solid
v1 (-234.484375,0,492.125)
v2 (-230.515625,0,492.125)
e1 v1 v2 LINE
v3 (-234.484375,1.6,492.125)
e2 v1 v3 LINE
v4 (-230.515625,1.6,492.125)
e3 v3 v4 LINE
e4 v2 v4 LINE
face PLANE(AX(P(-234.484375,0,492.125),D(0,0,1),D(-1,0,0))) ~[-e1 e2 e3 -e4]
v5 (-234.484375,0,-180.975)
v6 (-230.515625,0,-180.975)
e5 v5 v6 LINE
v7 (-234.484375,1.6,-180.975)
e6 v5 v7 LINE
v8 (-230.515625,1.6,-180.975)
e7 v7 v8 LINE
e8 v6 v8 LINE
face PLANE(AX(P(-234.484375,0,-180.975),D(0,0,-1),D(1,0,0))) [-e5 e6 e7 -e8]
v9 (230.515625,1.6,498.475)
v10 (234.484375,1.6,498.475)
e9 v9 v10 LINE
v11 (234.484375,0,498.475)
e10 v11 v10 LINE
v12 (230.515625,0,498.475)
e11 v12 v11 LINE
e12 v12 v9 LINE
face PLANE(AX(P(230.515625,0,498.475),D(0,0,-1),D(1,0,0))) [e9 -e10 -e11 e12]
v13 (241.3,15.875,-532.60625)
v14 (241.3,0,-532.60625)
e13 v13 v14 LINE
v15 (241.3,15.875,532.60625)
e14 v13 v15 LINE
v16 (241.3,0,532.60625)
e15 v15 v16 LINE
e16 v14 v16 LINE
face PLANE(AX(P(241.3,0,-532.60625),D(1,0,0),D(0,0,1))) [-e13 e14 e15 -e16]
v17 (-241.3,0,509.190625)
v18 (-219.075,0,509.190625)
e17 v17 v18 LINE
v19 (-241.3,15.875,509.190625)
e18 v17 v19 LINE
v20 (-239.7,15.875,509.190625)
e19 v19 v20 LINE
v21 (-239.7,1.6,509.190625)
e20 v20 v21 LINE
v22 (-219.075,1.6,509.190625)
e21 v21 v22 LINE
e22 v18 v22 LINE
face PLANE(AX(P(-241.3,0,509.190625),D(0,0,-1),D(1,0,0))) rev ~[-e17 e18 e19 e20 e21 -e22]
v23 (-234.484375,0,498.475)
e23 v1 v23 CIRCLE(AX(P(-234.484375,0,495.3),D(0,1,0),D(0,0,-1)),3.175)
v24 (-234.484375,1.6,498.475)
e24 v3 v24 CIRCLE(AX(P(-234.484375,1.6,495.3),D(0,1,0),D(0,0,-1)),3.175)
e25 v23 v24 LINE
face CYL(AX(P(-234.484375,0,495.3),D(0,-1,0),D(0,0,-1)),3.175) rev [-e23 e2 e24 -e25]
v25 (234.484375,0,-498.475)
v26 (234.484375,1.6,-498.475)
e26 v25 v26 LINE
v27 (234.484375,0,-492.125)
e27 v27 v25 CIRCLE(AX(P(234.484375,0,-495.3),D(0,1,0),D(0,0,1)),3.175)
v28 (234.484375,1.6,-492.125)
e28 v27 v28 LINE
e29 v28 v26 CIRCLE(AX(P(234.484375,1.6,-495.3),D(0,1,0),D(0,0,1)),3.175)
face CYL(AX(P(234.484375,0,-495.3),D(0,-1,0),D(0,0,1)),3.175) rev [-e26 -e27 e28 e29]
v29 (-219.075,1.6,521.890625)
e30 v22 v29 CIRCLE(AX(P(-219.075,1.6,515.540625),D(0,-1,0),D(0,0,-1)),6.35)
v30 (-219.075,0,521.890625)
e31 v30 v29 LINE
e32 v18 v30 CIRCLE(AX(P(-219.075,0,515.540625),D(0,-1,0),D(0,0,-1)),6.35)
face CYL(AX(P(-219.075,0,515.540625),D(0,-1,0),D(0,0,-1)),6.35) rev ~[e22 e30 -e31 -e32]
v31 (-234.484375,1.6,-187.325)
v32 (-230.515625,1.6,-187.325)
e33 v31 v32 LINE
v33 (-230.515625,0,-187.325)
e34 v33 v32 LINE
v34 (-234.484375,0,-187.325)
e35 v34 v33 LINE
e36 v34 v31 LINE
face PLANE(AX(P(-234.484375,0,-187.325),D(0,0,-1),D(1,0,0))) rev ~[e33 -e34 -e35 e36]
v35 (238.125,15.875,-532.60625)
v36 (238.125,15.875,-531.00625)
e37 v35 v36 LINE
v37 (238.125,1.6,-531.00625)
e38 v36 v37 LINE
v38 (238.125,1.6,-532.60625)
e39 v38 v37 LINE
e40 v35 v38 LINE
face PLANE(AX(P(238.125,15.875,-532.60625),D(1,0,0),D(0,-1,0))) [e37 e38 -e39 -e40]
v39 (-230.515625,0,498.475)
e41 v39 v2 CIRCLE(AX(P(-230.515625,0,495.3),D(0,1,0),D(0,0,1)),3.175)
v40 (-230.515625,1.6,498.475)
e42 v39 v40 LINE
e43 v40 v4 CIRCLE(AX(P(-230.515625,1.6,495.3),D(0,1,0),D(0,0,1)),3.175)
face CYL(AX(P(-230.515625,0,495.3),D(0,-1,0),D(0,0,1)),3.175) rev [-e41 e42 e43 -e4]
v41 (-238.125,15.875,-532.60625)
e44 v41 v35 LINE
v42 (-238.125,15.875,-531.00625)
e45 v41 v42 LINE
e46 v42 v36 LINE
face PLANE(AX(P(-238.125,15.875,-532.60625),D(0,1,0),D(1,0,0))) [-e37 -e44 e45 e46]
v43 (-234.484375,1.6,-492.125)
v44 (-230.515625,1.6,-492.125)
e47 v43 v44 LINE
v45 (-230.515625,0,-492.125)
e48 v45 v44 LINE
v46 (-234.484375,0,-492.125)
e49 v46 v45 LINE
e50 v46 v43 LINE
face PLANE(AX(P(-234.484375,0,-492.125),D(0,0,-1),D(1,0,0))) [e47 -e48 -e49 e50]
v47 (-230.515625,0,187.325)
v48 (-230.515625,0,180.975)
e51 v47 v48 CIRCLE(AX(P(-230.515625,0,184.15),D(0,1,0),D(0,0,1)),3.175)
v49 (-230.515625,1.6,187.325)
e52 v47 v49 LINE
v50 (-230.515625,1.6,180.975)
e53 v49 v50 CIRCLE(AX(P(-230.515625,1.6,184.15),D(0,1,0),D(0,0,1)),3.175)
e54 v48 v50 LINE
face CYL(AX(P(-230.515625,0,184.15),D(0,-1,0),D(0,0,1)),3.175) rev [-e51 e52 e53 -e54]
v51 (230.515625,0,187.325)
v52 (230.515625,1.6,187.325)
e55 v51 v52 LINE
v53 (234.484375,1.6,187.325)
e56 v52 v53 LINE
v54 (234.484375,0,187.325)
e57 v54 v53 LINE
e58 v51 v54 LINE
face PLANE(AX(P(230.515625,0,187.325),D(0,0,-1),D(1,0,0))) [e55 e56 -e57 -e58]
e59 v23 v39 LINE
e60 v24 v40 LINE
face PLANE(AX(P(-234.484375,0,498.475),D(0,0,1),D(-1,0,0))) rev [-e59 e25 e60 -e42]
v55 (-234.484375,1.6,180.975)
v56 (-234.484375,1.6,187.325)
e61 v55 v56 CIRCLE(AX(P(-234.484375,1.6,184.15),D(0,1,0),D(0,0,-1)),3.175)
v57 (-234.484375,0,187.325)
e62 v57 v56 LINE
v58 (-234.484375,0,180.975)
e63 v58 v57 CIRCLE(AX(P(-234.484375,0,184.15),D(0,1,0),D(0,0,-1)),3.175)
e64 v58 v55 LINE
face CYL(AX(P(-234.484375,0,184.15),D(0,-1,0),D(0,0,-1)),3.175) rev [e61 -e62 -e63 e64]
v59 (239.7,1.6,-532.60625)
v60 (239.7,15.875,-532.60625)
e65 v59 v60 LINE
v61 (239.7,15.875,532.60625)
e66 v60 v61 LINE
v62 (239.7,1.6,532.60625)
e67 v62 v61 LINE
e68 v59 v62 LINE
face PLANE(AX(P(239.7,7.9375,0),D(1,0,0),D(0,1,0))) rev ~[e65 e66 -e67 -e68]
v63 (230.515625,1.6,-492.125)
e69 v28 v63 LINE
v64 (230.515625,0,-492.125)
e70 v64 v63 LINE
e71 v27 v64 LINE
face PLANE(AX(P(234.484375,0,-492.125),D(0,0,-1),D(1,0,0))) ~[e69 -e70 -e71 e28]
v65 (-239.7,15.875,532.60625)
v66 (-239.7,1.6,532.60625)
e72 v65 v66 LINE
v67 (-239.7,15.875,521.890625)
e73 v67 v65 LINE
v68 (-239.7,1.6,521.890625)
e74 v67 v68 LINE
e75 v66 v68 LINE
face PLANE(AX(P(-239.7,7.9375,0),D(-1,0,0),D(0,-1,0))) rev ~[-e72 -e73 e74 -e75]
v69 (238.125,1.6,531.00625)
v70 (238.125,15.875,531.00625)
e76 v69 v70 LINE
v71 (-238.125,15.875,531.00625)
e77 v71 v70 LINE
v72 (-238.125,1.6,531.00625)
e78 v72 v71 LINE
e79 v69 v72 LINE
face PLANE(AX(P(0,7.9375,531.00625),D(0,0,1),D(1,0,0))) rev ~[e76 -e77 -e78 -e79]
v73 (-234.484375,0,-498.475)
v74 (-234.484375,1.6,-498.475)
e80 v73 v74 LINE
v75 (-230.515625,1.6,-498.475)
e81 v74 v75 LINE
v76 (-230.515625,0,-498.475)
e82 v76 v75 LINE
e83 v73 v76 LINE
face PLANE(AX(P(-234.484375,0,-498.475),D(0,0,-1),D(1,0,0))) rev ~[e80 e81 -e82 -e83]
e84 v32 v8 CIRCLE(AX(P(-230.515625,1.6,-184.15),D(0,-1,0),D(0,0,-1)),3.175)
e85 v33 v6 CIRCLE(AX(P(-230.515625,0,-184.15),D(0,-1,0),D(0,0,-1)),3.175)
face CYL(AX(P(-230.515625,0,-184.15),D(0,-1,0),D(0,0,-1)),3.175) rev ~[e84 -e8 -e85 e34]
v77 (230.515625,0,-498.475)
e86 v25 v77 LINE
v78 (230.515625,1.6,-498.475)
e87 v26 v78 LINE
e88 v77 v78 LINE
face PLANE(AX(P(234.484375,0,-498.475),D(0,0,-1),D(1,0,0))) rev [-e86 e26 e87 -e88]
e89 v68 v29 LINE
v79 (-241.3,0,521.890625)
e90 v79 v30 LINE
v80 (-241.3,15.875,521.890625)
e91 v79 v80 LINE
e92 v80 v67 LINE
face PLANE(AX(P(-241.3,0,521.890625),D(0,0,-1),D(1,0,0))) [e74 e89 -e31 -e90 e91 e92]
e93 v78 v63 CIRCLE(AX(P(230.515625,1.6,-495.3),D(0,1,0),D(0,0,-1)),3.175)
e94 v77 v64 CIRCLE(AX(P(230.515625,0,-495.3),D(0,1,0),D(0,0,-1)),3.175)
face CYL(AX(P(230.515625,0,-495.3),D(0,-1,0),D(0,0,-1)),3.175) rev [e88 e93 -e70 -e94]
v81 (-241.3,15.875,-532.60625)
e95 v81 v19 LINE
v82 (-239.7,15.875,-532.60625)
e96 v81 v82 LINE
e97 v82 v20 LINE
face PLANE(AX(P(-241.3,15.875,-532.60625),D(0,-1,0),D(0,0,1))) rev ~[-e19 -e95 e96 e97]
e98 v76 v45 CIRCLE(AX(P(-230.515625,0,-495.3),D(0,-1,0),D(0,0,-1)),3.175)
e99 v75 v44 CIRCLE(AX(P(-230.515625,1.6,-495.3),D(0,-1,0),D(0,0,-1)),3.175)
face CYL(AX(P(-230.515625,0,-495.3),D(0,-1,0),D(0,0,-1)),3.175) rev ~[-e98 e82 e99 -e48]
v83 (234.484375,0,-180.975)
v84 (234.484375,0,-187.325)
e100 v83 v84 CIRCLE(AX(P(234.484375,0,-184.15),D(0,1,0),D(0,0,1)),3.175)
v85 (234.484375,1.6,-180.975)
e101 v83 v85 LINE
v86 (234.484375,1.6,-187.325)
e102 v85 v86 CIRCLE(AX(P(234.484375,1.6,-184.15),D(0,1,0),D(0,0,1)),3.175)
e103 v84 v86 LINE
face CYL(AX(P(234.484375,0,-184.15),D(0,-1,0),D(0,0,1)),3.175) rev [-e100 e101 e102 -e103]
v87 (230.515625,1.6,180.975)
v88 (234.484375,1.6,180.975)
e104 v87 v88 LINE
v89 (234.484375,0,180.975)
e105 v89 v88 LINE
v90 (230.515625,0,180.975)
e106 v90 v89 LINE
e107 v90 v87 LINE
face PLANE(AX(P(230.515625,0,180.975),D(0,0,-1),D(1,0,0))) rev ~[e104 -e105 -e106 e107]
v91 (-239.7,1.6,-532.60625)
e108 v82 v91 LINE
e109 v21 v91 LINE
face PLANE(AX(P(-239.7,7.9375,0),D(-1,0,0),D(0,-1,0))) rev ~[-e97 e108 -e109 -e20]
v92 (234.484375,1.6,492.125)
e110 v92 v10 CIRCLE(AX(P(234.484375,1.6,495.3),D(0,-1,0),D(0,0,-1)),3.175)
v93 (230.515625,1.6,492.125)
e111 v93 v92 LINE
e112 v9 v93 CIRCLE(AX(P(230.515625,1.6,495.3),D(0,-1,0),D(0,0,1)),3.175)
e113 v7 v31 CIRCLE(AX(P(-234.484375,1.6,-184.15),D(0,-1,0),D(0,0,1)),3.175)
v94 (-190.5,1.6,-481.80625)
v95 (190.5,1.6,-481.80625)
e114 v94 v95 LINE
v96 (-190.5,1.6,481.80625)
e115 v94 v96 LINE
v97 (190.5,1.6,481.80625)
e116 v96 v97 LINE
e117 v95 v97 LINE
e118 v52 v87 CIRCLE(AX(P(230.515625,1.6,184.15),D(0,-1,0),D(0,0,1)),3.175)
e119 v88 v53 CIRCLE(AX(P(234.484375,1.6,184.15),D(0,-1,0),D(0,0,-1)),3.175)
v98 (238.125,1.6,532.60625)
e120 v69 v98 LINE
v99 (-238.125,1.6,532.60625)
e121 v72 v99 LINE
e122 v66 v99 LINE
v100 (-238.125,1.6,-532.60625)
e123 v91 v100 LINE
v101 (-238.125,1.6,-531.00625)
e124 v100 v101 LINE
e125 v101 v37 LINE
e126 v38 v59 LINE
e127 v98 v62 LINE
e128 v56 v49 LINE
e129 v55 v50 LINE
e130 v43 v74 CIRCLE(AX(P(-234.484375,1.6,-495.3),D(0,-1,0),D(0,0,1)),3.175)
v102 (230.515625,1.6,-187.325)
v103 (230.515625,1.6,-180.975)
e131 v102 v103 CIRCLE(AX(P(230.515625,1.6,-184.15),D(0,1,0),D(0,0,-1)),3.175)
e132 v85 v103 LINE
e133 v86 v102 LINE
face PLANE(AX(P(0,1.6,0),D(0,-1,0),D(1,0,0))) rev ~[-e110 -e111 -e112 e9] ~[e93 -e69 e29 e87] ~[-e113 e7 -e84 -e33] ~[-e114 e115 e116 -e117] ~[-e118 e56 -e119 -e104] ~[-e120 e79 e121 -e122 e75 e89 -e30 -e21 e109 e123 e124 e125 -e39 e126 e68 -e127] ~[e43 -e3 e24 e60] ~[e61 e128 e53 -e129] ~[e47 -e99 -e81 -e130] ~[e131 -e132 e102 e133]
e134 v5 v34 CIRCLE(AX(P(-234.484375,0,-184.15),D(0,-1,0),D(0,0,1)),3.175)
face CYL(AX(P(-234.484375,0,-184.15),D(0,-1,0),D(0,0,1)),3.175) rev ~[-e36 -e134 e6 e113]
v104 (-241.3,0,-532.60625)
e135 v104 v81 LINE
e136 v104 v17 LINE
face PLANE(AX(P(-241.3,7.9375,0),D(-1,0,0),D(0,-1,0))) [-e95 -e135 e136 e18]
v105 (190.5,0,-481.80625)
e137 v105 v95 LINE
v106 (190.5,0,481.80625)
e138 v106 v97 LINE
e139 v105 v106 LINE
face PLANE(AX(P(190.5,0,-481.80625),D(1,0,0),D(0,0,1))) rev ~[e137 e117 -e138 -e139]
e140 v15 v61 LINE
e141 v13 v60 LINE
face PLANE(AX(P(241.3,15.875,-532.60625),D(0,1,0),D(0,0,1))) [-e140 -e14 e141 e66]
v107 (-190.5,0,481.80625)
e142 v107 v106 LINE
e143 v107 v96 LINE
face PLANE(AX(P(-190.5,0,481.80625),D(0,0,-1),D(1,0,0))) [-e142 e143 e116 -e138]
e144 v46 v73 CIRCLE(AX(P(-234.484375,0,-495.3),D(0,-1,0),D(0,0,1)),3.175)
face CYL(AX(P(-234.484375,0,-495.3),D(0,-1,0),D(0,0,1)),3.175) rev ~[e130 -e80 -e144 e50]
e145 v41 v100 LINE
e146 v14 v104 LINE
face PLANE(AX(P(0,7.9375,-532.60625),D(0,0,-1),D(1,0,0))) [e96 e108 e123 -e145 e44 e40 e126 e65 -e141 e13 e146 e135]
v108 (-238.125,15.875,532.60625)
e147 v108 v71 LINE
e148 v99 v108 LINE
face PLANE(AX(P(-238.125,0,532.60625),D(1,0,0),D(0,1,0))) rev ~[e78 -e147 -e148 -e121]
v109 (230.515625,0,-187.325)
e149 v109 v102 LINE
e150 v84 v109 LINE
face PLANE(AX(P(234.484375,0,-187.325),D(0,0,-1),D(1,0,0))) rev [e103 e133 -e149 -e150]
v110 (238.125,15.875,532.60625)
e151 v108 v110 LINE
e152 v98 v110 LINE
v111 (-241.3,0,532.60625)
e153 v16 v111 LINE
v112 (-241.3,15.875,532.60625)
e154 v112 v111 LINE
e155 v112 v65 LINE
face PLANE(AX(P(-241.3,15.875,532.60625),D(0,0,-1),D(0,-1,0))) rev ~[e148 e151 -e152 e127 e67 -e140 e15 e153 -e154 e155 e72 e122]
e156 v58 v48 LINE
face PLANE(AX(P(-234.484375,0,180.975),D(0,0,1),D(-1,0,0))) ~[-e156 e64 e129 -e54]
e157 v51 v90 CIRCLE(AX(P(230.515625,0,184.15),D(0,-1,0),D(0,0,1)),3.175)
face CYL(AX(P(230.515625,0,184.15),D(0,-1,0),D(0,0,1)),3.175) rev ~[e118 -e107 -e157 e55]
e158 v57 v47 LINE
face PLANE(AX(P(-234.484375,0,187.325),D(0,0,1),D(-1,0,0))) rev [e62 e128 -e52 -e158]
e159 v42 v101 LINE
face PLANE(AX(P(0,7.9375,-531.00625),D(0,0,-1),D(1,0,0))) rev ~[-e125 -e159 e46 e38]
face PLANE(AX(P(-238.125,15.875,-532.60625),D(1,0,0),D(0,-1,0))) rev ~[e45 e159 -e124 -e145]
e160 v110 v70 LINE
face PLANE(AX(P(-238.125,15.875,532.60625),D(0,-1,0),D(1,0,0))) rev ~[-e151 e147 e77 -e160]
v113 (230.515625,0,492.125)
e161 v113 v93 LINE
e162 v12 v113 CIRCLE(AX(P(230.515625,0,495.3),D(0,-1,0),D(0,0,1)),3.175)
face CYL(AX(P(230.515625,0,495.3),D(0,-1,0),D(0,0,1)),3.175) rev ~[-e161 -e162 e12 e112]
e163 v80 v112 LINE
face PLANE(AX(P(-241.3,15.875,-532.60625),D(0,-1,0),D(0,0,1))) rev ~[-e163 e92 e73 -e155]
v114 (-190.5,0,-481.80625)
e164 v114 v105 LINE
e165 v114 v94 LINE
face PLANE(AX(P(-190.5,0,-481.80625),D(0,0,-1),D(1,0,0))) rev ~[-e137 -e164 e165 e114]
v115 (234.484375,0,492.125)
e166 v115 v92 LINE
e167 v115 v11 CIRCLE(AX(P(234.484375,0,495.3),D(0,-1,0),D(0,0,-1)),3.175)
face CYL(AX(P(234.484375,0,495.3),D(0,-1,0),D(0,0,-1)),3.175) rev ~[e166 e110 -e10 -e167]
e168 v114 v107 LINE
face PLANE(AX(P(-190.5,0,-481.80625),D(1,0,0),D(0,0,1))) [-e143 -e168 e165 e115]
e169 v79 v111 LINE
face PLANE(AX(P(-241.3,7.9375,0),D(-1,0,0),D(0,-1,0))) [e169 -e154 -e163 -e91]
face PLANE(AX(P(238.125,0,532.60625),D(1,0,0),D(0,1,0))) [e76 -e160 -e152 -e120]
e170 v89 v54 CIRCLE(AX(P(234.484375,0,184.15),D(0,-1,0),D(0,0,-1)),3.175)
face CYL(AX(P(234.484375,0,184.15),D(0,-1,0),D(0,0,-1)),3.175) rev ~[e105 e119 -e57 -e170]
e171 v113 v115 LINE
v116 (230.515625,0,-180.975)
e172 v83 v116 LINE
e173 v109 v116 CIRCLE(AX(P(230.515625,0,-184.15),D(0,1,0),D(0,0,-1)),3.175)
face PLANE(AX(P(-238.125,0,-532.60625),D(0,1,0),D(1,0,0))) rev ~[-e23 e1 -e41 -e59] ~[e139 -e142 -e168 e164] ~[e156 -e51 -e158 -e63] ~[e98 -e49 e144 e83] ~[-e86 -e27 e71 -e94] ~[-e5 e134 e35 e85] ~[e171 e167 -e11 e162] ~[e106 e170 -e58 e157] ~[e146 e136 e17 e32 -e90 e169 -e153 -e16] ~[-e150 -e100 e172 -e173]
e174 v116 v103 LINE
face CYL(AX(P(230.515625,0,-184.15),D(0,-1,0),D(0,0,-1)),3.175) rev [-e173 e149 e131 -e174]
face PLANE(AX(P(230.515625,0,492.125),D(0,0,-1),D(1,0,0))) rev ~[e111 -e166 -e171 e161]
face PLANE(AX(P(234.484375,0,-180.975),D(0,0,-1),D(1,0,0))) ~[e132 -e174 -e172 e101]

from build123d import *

# Parameters (mm, degrees)
F0_W              = 482.6
F0_H              = 1065.2125
F1_DEPTH          = 1.6
F2_W              = 15.875
F2_H              = 1065.2125
F3_DEPTH          = 1.6
F4_W              = 15.875
F4_H              = 1065.2125
F5_DEPTH          = 1.6
F6_W              = 476.25
F6_H              = 15.875
F7_DEPTH          = 1.6
F8_W              = 476.25
F8_H              = 15.875
F9_DEPTH          = 1.6
F10_W             = 381
F10_H             = 963.6125
F11_DEPTH         = 1.6
F12_W             = 3.96875
F12_H             = 6.35
F13_DEPTH         = 1.6
F13_COPIES3_COUNT = 2
F13_COPIES3_PITCH = 1094.309536
F13_COPIES4_COUNT = 2
F13_COPIES4_PITCH = 823.333045
F14_W             = 3.96875
F14_H             = 6.35
F15_DEPTH         = 1.6
F16_W             = 22.225
F16_H             = 12.7
F17_DEPTH         = 16


# Not quite as in the source:
# - a pattern or mirror of a feature is missing from the dataset's text; its kind, count and spacing are read off the source's solid


with BuildPart() as f1:
    # F0 (on Front) → F1 (new body)
    with BuildSketch(Plane.XZ):
        Rectangle(F0_W, F0_H)
    extrude(amount=-F1_DEPTH)

    # F2 (on face) → F3 (join)
    with BuildSketch(Plane(origin=(-241.3, 0, 0), x_dir=(0, -1, 0), z_dir=(-1, 0, 0))):
        with Locations((-7.9375, 0)):
            Rectangle(F2_W, F2_H)
    extrude(amount=-F3_DEPTH)

    # F4 (on face) → F5 (join)
    with BuildSketch(Plane.YZ.offset(241.3)):
        with Locations((7.9375, 0)):
            Rectangle(F4_W, F4_H)
    extrude(amount=-F5_DEPTH)

    # F6 (on face) → F7 (join)
    with BuildSketch(Plane.XY.offset(532.60625)):
        with Locations((0, 7.9375)):
            Rectangle(F6_W, F6_H)
    extrude(amount=-F7_DEPTH)

    # F8 (on face) → F9 (join)
    with BuildSketch(Plane(origin=(0, 0, -532.60625), x_dir=(1, 0, 0), z_dir=(0, 0, -1))):
        with Locations((0, -7.9375)):
            Rectangle(F8_W, F8_H)
    extrude(amount=-F9_DEPTH)

    # F10 (on face) → F11 (cut)
    with BuildSketch(Plane.XZ):
        Rectangle(F10_W, F10_H)
    extrude(amount=-F11_DEPTH, mode=Mode.SUBTRACT)

    # F12 (on face) → F13 (cut)
    with BuildSketch(Plane.XZ):
        with Locations((-232.5, -495.3)):
            Rectangle(F12_W, F12_H)
        with BuildLine():
            Line((-230.515625, -492.125), (-230.515625, -498.475))
            ThreePointArc((-230.515625, -498.475), (-227.340625, -495.3), (-230.515625, -492.125))
        make_face()
        with BuildLine():
            ThreePointArc((-234.484375, -492.125), (-237.659375, -495.3), (-234.484375, -498.475))
            Line((-234.484375, -498.475), (-234.484375, -492.125))
        make_face()
    f13 = extrude(amount=-F13_DEPTH, mode=Mode.SUBTRACT)

    # F13_copies: F13 across plane
    add(f13.mirror(Plane.XY), mode=Mode.SUBTRACT)

    # F13_copies1: F13 across plane
    add(f13.mirror(Plane.XY.offset(-155.575)), mode=Mode.SUBTRACT)

    # F13_copies2: F13 across plane
    add(f13.mirror(Plane(origin=(0, 0, 0), x_dir=(0, 0, 1), z_dir=(1, 0, 0))), mode=Mode.SUBTRACT)

    # F13_copies3: F13 ×2
    with Locations(*[Vector(0.4249254757, 0, 0.9052283359) * (i * F13_COPIES3_PITCH) for i in range(1, F13_COPIES3_COUNT)]):
        add(f13, mode=Mode.SUBTRACT)

    # F13_copies4: F13 ×2
    with Locations(*[Vector(0.5647775259, 0, 0.8252432043) * (i * F13_COPIES4_PITCH) for i in range(1, F13_COPIES4_COUNT)]):
        add(f13, mode=Mode.SUBTRACT)

    # F14 (on face) → F15 (cut)
    with BuildSketch(Plane.XZ):
        with Locations((-232.5, -184.15)):
            Rectangle(F14_W, F14_H)
        with BuildLine():
            Line((-230.515625, -180.975), (-230.515625, -187.325))
            ThreePointArc((-230.515625, -187.325), (-227.340625, -184.15), (-230.515625, -180.975))
        make_face()
        with BuildLine():
            ThreePointArc((-234.484375, -180.975), (-237.659375, -184.15), (-234.484375, -187.325))
            Line((-234.484375, -187.325), (-234.484375, -180.975))
        make_face()
    f15 = extrude(amount=-F15_DEPTH, mode=Mode.SUBTRACT)

    # F15_copies: F15 across plane
    add(f15.mirror(Plane(origin=(0, 0, 0), x_dir=(0, 0, 1), z_dir=(1, 0, 0))), mode=Mode.SUBTRACT)

    # F16 (on face) → F17 (cut)
    with BuildSketch(Plane.XZ):
        with Locations((-230.1875, 515.540625)):
            Rectangle(F16_W, F16_H)
        with BuildLine():
            Line((-219.075, 521.890625), (-219.075, 509.190625))
            ThreePointArc((-219.075, 509.190625), (-212.725, 515.540625), (-219.075, 521.890625))
        make_face()
    extrude(amount=-F17_DEPTH, mode=Mode.SUBTRACT)


solid = f1.part
